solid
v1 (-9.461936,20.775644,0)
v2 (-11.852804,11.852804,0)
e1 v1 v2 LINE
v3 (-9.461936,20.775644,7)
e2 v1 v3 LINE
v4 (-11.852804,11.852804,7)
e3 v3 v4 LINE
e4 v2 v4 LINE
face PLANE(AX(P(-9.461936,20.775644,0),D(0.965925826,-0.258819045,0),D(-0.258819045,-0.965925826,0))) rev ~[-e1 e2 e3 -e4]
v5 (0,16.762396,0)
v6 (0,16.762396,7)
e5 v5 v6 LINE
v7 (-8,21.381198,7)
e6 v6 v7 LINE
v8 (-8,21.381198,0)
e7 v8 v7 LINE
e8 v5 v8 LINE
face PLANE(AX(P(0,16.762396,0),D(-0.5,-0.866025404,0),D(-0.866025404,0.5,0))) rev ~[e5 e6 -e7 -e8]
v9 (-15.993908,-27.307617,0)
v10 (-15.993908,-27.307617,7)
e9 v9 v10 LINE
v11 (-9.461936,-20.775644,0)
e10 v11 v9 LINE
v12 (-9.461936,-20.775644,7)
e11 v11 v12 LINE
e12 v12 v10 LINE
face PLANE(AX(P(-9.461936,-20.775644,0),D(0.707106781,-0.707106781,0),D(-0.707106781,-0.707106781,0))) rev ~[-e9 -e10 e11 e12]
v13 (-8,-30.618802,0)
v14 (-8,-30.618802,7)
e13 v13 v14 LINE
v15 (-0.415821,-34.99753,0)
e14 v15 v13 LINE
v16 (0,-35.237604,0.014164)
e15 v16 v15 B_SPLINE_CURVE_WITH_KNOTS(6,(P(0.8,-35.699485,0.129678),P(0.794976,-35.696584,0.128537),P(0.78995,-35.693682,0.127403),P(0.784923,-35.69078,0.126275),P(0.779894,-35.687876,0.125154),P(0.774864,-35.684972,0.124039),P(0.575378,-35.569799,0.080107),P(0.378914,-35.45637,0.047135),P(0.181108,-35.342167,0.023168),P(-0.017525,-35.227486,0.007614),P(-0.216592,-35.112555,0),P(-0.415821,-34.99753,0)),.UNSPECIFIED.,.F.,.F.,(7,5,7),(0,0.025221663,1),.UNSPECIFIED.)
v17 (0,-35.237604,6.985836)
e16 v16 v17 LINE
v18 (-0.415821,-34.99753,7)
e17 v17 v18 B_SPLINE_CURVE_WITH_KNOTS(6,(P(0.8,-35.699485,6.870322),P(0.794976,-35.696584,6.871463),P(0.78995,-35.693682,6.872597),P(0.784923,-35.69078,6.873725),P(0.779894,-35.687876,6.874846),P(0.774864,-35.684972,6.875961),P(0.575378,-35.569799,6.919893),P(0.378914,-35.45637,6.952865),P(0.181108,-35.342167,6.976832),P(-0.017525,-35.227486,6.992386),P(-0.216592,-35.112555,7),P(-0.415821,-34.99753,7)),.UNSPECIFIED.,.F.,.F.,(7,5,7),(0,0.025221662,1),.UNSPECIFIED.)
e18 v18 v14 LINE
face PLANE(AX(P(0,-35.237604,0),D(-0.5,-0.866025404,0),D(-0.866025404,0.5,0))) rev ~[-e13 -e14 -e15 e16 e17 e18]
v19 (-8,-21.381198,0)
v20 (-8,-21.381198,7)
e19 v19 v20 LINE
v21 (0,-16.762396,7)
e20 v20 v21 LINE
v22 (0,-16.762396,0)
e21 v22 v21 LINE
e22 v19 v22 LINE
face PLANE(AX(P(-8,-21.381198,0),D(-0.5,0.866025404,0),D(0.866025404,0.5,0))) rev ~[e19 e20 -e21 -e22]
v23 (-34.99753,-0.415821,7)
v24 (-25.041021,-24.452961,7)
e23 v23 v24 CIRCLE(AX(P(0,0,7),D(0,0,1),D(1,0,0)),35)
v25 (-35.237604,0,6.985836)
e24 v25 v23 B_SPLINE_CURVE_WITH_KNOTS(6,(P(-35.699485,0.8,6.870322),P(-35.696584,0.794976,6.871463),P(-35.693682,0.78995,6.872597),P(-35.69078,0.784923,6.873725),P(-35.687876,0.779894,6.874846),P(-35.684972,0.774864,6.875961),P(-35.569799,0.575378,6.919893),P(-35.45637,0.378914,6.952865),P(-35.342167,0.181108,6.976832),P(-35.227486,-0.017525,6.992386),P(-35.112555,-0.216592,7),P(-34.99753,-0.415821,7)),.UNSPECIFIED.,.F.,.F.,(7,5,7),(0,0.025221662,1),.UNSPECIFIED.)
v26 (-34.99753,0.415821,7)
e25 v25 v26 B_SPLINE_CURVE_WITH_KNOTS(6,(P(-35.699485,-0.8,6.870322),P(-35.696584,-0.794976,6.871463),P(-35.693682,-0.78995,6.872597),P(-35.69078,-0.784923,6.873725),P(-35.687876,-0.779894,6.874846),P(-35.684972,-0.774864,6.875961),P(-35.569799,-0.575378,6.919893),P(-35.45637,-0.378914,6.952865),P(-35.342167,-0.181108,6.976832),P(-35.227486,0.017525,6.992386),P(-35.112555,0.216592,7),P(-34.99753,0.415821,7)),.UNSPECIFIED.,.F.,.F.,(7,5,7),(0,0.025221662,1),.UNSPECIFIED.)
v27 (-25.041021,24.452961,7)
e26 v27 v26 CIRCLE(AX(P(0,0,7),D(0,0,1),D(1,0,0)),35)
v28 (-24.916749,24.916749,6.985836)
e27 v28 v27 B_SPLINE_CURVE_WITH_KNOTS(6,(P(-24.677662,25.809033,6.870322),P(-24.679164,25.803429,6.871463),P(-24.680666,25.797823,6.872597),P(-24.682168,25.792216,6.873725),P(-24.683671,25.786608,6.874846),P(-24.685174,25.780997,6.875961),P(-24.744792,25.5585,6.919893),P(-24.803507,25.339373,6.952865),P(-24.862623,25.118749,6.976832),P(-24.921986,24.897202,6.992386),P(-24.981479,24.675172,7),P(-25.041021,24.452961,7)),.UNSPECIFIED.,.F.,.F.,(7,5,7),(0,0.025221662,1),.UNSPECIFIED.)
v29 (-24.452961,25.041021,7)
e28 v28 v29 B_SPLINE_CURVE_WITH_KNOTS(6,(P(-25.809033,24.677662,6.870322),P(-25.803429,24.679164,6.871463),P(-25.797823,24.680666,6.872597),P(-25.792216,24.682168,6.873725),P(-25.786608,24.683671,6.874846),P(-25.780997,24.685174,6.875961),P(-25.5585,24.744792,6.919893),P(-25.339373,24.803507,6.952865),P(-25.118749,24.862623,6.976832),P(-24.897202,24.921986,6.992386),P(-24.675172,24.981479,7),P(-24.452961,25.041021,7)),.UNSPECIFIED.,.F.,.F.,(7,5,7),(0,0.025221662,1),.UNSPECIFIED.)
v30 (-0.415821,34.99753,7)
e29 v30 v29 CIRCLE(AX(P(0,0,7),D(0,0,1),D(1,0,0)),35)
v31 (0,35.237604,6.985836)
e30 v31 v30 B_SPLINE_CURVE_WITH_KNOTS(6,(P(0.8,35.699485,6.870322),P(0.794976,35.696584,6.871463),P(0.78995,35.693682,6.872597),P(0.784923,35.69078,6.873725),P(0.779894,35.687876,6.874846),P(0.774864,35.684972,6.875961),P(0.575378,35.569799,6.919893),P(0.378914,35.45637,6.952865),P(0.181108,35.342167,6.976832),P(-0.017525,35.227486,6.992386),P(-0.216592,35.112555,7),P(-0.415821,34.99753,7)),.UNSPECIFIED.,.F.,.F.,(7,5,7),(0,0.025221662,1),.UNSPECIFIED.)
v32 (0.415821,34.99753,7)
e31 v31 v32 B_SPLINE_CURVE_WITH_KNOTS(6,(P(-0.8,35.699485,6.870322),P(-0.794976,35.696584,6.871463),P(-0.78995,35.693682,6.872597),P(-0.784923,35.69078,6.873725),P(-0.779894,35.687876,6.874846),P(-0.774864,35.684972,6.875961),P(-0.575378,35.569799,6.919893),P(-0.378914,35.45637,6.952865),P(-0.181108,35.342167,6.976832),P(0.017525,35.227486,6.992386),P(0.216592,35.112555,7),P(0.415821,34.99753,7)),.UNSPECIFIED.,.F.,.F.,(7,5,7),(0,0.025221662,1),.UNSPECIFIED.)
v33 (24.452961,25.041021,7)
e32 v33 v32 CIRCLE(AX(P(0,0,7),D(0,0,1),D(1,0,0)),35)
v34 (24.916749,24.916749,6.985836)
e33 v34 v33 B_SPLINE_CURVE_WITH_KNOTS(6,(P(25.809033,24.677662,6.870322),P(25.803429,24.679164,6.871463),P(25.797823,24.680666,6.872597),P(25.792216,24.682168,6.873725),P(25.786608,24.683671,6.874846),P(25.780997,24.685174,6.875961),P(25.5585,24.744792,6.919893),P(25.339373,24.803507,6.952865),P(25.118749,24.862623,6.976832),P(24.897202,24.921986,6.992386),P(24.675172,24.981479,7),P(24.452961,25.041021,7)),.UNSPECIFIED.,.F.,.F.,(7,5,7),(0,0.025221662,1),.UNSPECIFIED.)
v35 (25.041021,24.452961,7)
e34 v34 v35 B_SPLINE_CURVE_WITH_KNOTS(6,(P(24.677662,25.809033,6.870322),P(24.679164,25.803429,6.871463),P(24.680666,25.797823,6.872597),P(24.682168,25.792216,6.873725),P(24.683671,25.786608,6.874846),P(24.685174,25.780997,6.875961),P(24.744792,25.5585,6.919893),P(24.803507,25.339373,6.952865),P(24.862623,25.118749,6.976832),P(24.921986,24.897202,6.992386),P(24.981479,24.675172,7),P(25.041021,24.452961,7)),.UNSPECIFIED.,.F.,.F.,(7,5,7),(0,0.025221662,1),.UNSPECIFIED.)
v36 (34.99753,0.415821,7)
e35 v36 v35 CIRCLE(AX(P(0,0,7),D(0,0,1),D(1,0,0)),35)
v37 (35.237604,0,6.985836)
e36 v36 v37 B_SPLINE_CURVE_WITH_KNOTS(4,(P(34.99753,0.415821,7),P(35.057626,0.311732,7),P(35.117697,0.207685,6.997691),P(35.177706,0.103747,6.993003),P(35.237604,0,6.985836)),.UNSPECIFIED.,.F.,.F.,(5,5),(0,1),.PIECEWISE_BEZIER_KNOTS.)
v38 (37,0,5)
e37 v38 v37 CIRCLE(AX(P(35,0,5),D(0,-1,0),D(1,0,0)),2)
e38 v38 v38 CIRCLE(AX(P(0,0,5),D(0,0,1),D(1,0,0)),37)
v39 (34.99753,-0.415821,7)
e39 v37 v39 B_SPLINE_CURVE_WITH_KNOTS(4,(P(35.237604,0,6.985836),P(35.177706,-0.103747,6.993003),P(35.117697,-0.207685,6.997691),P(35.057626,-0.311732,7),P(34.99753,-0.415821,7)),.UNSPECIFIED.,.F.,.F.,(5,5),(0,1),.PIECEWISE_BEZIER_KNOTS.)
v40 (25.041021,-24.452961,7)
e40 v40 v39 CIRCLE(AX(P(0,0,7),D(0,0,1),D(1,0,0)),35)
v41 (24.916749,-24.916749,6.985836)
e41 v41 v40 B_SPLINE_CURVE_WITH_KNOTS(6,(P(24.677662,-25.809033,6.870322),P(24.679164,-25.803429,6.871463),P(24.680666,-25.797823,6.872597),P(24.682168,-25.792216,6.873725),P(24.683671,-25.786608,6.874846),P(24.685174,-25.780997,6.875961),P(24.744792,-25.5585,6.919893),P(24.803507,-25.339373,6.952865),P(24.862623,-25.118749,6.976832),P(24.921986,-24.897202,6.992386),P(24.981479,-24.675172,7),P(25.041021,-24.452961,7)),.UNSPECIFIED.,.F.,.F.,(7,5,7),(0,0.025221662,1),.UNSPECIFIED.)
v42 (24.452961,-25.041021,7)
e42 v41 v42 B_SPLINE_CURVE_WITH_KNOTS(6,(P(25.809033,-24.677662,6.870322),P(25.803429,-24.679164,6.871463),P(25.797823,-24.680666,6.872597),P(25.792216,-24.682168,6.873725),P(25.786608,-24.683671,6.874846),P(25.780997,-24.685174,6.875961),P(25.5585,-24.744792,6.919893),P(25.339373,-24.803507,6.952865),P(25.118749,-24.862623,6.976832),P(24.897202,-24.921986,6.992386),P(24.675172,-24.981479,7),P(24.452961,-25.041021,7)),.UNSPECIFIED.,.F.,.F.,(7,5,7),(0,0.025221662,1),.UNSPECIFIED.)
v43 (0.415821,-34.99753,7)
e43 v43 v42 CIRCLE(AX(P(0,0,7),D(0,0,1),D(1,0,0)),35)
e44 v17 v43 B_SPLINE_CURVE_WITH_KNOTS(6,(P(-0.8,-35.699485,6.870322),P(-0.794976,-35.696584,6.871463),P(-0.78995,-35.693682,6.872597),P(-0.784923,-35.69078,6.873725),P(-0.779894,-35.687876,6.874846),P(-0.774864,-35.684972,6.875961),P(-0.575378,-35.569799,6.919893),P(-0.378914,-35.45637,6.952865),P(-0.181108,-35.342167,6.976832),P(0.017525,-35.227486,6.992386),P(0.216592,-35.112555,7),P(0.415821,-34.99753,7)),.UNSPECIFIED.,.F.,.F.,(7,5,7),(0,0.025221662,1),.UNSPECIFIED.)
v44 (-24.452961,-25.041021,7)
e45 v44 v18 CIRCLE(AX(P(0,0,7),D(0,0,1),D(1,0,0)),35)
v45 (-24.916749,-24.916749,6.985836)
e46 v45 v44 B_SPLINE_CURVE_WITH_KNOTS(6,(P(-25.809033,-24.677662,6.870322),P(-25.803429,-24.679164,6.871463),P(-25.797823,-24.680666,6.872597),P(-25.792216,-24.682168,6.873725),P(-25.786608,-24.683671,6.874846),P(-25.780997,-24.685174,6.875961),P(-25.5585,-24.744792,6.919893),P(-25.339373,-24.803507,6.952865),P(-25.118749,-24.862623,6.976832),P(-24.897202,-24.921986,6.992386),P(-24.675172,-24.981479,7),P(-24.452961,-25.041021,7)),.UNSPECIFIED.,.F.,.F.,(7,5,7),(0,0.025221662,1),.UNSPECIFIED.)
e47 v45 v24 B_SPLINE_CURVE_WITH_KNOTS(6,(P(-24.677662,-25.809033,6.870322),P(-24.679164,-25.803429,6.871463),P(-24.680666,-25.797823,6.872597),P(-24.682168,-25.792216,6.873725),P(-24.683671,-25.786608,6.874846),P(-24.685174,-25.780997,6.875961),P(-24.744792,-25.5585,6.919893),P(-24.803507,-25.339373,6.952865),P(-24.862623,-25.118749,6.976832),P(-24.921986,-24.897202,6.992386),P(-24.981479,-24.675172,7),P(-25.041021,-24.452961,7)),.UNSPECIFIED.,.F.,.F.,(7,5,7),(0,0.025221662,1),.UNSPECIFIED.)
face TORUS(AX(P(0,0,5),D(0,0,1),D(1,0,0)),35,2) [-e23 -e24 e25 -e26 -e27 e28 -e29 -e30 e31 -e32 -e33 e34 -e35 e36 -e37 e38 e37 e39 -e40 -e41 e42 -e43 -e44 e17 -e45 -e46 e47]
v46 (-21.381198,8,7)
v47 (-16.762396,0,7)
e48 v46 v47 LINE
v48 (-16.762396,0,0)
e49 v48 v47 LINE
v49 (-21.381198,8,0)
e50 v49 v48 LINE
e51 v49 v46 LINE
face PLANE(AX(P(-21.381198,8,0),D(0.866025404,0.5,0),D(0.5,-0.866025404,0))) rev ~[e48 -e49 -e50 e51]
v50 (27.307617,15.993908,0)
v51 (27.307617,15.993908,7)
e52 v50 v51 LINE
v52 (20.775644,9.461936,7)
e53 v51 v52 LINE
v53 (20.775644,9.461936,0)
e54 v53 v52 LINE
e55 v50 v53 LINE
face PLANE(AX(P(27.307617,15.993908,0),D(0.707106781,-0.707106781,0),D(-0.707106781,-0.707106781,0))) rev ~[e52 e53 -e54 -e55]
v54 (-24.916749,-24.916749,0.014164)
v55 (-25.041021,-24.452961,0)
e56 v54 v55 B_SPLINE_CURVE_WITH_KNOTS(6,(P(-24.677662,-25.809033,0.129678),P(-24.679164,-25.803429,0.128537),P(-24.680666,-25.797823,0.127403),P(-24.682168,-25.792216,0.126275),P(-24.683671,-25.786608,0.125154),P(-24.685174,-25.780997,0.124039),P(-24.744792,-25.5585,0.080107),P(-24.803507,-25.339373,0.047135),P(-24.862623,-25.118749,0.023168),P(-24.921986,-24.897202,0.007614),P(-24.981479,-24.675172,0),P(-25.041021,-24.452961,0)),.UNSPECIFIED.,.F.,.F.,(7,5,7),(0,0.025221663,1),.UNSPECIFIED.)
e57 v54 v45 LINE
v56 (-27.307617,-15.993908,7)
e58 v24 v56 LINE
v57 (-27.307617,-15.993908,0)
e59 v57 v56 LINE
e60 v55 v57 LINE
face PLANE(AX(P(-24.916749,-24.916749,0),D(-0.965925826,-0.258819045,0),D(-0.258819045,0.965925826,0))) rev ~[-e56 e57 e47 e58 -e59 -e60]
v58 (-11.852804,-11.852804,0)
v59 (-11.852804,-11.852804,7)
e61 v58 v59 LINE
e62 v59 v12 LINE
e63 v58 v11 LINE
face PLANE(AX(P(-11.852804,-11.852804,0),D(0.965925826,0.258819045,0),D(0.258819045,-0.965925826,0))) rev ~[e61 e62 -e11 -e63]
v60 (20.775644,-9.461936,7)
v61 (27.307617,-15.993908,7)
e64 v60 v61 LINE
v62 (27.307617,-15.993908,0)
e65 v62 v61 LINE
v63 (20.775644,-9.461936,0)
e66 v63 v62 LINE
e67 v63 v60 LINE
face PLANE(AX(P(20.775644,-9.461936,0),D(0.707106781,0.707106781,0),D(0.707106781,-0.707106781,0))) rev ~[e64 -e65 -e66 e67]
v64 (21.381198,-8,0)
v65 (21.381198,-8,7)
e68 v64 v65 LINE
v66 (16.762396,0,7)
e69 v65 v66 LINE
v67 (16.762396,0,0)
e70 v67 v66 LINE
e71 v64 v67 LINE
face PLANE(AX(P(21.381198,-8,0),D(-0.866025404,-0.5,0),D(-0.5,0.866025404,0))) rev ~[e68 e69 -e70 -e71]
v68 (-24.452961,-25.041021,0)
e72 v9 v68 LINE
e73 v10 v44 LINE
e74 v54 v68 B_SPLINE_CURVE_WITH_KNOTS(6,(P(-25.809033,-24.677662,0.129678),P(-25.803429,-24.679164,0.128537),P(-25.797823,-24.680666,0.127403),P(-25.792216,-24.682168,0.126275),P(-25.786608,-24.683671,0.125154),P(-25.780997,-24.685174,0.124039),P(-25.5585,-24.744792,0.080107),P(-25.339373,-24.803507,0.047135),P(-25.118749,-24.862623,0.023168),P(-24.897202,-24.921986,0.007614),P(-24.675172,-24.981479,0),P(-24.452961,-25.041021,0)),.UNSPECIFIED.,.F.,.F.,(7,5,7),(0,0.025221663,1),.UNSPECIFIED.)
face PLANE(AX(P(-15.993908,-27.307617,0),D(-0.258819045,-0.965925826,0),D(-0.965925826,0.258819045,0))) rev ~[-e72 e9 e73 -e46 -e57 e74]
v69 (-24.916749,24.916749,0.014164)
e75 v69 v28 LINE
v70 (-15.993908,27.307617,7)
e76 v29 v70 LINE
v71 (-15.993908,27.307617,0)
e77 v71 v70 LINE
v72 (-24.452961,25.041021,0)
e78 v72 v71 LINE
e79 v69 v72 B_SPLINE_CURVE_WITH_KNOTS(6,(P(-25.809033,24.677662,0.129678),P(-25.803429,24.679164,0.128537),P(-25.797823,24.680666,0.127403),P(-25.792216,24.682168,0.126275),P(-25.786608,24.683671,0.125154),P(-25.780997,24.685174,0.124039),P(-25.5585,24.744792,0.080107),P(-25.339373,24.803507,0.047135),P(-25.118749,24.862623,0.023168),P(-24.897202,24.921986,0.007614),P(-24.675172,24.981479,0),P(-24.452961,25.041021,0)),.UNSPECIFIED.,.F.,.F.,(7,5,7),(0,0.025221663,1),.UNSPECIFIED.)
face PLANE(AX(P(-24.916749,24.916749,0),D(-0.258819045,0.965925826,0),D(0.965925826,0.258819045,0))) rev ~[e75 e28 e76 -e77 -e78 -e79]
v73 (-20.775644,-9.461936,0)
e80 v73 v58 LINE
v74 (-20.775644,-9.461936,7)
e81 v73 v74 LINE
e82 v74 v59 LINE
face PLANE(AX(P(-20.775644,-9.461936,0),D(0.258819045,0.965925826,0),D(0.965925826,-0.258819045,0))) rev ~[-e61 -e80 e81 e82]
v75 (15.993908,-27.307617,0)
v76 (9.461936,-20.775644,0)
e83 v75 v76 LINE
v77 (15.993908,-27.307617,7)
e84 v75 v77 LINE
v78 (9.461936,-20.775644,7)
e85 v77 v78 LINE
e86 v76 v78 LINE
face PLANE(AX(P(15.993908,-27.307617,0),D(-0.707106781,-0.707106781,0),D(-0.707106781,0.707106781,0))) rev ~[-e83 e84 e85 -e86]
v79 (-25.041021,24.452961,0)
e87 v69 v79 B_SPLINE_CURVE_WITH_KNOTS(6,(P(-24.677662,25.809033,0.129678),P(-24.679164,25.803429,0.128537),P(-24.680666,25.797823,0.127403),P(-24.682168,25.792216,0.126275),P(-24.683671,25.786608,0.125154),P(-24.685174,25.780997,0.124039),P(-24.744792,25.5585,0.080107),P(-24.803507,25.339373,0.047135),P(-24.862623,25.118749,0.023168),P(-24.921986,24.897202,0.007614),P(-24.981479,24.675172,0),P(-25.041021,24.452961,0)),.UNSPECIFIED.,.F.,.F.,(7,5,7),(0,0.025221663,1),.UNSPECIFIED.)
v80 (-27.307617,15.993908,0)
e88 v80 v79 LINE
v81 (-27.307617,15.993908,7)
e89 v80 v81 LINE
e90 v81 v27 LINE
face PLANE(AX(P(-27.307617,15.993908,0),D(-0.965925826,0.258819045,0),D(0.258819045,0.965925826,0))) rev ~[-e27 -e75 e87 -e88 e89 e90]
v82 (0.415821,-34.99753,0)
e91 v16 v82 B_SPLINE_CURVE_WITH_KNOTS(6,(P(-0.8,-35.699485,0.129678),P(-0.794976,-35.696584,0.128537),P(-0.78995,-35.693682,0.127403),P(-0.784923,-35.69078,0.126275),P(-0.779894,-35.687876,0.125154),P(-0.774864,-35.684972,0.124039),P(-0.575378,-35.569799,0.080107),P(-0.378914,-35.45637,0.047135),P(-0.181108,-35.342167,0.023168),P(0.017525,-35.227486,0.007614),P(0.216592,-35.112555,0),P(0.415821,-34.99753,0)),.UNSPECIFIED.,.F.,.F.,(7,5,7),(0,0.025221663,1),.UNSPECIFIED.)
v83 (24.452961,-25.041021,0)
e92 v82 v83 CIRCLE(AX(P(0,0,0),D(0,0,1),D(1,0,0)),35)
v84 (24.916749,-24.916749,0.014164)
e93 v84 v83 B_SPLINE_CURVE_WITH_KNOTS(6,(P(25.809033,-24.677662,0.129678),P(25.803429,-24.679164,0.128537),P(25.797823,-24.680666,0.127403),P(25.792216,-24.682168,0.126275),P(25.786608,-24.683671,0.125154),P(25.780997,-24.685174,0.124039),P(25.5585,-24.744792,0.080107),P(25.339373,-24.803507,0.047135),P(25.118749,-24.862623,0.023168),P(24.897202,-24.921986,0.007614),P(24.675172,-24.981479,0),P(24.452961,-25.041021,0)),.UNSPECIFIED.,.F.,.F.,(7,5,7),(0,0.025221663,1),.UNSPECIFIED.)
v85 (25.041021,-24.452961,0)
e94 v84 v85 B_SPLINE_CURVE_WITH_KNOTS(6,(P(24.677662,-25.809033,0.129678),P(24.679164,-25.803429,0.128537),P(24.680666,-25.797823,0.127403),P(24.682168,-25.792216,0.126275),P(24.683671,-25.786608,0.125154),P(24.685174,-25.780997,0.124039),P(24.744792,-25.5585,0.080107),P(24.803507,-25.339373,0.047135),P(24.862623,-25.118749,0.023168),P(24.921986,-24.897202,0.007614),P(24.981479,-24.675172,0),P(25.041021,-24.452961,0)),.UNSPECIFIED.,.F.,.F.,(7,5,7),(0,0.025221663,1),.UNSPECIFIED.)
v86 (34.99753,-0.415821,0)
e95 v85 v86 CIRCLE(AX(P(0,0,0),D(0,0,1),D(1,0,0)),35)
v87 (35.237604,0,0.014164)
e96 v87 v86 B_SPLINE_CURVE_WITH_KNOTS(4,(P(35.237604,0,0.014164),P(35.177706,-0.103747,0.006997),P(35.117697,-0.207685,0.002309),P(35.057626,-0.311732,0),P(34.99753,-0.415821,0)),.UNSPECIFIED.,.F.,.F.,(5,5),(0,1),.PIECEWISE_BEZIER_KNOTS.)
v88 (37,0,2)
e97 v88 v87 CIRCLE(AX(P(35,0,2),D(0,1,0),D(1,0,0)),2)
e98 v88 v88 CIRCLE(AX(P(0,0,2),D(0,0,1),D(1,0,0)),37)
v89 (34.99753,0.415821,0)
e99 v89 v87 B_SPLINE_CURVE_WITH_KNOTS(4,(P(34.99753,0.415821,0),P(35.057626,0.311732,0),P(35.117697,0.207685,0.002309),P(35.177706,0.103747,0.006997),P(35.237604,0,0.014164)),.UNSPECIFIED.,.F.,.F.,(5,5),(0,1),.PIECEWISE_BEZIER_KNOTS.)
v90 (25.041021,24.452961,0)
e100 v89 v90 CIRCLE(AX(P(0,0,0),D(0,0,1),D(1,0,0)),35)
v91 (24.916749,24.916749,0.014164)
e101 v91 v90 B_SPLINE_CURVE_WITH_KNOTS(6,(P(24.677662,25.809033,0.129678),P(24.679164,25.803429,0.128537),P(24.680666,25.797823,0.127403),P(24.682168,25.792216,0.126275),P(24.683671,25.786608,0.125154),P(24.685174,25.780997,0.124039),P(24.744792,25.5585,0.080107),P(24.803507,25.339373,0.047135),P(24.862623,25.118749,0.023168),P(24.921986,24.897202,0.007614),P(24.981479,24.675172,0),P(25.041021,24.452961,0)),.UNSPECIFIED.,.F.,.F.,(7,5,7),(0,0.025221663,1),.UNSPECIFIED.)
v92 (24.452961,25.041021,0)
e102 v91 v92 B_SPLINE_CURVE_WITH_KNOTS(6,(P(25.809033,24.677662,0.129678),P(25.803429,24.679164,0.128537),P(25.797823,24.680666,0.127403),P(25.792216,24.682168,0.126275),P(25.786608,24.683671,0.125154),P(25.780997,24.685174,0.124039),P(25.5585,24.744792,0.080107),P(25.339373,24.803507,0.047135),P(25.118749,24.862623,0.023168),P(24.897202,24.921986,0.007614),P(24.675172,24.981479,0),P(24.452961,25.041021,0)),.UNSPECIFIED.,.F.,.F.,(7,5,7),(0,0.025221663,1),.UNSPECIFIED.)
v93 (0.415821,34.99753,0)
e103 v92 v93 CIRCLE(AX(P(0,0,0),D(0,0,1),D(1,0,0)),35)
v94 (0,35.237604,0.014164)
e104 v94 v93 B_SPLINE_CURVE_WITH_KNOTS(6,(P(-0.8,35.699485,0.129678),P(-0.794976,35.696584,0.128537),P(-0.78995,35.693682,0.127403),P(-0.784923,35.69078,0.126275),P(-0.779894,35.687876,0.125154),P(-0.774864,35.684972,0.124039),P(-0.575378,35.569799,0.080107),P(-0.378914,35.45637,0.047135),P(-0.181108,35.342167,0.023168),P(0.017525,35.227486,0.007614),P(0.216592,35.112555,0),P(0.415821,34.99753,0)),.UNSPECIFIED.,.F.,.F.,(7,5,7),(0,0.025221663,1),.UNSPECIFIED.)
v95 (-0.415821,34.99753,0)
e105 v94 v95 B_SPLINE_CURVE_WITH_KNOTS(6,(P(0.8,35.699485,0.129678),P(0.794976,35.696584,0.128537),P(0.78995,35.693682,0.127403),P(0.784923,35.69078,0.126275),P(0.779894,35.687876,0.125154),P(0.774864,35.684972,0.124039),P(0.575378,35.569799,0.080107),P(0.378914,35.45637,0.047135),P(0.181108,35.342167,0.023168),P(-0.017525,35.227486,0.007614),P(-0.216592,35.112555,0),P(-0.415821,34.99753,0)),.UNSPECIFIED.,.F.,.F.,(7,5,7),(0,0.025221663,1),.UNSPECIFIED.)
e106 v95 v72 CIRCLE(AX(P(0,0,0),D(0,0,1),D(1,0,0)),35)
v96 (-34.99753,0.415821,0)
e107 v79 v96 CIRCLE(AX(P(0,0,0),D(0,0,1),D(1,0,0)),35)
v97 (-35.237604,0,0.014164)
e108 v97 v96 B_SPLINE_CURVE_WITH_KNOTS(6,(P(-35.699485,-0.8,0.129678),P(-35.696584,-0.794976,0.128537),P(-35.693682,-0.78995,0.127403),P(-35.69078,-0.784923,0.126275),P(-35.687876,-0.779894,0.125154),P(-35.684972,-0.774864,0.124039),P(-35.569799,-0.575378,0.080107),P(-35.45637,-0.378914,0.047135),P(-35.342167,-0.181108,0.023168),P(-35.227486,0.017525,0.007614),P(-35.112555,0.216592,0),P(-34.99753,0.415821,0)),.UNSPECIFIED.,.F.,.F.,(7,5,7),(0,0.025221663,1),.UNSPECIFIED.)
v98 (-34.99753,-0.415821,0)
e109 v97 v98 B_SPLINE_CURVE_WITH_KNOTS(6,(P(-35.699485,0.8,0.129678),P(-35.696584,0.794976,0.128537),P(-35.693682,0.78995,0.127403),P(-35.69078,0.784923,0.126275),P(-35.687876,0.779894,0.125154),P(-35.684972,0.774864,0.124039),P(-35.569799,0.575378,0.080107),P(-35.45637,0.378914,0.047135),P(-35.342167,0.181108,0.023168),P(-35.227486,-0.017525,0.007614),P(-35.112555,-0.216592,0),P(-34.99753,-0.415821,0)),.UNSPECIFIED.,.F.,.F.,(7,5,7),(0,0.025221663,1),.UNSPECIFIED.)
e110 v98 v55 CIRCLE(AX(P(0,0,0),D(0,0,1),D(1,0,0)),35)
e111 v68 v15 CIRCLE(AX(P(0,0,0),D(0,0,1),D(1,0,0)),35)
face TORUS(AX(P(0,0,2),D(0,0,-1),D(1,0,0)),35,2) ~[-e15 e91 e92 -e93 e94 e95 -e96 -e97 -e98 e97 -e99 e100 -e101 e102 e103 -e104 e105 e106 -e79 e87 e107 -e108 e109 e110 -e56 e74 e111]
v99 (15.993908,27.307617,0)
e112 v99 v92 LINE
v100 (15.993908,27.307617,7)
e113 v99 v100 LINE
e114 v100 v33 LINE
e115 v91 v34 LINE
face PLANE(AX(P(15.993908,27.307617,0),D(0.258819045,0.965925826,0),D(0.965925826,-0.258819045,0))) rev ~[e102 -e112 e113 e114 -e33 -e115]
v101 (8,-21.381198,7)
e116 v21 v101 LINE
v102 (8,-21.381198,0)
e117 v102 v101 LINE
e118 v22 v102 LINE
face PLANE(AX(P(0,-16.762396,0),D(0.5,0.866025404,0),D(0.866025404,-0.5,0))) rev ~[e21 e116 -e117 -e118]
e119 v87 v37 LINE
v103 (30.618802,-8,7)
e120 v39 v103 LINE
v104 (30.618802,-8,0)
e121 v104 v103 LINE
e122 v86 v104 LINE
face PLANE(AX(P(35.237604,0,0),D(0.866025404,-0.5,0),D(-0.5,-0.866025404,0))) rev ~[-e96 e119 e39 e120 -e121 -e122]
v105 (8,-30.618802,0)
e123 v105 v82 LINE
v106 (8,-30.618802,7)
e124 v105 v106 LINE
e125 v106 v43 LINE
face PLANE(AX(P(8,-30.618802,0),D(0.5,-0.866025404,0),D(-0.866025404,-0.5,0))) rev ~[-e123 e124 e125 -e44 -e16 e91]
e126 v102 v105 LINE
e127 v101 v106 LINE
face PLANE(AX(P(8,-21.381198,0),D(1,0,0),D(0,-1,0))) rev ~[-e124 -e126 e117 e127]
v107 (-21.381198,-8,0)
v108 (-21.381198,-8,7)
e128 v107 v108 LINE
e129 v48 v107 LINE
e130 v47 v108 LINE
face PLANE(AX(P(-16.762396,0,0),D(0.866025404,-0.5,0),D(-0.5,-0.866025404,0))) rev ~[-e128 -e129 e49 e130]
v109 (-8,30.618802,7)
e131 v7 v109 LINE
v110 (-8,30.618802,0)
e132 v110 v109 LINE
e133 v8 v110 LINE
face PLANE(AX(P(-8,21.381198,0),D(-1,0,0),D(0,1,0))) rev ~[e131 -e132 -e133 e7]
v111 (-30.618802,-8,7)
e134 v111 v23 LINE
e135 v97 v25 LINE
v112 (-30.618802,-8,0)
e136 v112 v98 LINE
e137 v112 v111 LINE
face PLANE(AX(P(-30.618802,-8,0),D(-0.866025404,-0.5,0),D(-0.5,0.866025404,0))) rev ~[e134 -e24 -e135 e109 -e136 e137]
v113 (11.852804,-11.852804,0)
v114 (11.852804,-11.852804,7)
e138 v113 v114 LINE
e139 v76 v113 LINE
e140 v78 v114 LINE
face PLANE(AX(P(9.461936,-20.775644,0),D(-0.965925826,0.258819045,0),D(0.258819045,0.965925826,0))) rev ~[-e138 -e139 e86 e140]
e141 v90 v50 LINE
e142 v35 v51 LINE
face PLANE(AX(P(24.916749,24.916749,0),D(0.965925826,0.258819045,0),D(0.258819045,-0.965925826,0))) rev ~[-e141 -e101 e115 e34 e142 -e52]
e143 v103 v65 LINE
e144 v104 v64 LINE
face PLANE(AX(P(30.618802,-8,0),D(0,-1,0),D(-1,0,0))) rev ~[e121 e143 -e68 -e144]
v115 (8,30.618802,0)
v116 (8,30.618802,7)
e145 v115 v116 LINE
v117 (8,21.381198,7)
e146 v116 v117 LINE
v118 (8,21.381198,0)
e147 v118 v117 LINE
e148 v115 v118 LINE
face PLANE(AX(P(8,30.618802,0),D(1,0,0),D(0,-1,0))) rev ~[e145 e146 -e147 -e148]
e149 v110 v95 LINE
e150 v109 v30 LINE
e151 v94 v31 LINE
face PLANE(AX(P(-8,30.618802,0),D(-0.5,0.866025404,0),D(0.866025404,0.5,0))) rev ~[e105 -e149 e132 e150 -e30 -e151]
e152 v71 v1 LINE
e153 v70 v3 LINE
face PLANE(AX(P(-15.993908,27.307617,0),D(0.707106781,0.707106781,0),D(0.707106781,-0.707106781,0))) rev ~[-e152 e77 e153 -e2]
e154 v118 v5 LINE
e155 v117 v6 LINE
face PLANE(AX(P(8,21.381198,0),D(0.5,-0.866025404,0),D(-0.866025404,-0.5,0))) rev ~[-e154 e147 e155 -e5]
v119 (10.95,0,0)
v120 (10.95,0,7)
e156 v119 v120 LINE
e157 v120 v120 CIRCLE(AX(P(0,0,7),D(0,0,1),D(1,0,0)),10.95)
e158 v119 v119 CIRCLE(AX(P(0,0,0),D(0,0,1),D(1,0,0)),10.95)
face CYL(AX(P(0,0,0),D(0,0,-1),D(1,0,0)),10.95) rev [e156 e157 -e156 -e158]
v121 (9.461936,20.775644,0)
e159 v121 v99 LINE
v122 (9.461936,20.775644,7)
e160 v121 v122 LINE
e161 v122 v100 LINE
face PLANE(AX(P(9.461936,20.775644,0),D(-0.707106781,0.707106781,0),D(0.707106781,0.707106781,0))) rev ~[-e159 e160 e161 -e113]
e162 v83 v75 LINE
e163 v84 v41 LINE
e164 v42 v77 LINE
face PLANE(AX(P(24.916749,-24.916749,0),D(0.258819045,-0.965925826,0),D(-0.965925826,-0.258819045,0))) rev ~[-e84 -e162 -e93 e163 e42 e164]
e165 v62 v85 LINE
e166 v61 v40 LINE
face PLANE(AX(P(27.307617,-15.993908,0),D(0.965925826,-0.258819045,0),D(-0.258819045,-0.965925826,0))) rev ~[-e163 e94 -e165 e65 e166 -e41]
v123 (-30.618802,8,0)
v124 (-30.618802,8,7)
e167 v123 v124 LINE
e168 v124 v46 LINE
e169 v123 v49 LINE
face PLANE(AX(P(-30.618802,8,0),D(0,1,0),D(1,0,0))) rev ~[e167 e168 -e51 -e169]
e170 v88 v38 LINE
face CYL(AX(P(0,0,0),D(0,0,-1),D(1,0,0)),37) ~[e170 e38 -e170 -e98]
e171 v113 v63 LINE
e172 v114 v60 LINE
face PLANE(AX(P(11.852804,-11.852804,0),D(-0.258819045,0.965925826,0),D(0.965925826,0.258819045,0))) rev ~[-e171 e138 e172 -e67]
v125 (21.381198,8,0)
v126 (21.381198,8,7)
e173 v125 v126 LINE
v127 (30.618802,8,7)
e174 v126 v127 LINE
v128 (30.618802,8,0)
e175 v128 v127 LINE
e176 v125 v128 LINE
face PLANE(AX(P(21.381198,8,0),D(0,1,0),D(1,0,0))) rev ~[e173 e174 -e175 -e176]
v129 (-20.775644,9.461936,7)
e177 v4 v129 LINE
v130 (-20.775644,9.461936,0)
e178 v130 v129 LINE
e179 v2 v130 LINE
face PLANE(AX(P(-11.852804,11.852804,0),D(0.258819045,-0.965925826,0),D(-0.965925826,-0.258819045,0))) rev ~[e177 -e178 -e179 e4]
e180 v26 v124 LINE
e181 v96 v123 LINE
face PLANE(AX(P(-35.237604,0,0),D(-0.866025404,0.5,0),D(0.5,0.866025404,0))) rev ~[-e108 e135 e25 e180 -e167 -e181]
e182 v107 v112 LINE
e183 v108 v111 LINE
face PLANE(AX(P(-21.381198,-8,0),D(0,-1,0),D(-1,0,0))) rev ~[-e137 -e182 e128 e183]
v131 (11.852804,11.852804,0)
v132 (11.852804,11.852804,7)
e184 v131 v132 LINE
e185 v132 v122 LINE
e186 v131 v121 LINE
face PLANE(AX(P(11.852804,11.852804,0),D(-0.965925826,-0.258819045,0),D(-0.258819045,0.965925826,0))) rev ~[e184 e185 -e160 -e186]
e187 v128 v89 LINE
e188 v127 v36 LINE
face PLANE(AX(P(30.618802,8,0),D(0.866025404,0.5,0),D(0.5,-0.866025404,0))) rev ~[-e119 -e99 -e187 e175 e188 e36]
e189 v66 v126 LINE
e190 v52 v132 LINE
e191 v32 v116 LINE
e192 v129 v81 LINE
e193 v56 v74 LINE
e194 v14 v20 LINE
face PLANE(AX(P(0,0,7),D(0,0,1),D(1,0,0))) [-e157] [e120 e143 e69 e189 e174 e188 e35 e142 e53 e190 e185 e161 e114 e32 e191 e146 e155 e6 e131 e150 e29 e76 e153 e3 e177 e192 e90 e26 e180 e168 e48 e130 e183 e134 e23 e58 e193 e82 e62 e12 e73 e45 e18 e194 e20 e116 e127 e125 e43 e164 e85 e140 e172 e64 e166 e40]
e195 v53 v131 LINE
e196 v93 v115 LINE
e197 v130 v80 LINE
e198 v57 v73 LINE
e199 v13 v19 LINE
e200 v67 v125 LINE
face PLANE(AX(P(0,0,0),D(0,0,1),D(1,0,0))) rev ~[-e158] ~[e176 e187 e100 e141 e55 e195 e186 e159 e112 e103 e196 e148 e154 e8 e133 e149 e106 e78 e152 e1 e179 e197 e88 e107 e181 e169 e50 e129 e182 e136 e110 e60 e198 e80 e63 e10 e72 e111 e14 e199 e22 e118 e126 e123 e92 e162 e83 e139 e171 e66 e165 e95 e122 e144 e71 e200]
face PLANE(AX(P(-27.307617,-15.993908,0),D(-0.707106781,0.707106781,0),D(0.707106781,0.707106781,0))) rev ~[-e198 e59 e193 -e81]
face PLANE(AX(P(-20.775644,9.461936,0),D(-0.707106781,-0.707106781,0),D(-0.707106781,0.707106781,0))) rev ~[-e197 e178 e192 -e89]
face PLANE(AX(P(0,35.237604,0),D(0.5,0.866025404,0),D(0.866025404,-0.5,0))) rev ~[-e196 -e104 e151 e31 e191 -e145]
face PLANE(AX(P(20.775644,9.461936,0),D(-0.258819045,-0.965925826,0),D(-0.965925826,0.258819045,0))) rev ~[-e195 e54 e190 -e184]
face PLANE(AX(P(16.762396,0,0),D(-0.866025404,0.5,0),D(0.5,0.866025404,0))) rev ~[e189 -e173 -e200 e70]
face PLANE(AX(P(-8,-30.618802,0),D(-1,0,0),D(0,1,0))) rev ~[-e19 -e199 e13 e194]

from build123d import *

# Parameters (mm, degrees)
F0_R     = 37
F0_R_2   = 10.95
F1_DEPTH = 7


# Not quite as in the source:
# - a fillet or chamfer that OpenCascade refuses, or shapes differently, is made with other operations: its cross-section is extruded or revolved along the edge and cut away or added


with BuildPart() as f1:
    # F0 (on Top) → F1 (new body)
    with BuildSketch(Plane.XY):
        Circle(F0_R)
        Polygon((-15.9939083851, -27.3076168841), (-24.9167489583, -24.9167489583), (-27.3076168841, -15.9939083851), (-20.7756442366, -9.4619357376), (-11.8528036634, -11.8528036634), (-9.4619357376, -20.7756442366), align=None, mode=Mode.SUBTRACT)
        Polygon((8, -30.6188021535), (0, -35.237604307), (-8, -30.6188021535), (-8, -21.3811978465), (0, -16.762395693), (8, -21.3811978465), align=None, mode=Mode.SUBTRACT)
        Polygon((27.3076168841, -15.9939083851), (24.9167489583, -24.9167489583), (15.9939083851, -27.3076168841), (9.4619357376, -20.7756442366), (11.8528036634, -11.8528036634), (20.7756442366, -9.4619357376), align=None, mode=Mode.SUBTRACT)
        Polygon((-30.6188021535, -8), (-35.237604307, 0), (-30.6188021535, 8), (-21.3811978465, 8), (-16.762395693, 0), (-21.3811978465, -8), align=None, mode=Mode.SUBTRACT)
        Polygon((-27.3076168841, 15.9939083851), (-24.9167489583, 24.9167489583), (-15.9939083851, 27.3076168841), (-9.4619357376, 20.7756442366), (-11.8528036634, 11.8528036634), (-20.7756442366, 9.4619357376), align=None, mode=Mode.SUBTRACT)
        Circle(F0_R_2, mode=Mode.SUBTRACT)
        Polygon((15.9939083851, 27.3076168841), (24.9167489583, 24.9167489583), (27.3076168841, 15.9939083851), (20.7756442366, 9.4619357376), (11.8528036634, 11.8528036634), (9.4619357376, 20.7756442366), align=None, mode=Mode.SUBTRACT)
        Polygon((30.6188021535, 8), (35.237604307, 0), (30.6188021535, -8), (21.3811978465, -8), (16.762395693, 0), (21.3811978465, 8), align=None, mode=Mode.SUBTRACT)
        Polygon((0, 35.237604307), (8, 30.6188021535), (8, 21.3811978465), (0, 16.762395693), (-8, 21.3811978465), (-8, 30.6188021535), align=None, mode=Mode.SUBTRACT)
    extrude(amount=F1_DEPTH)

    # F2: fillet of radius 2 on 2 edges, made by hand

    # F2_s1 → F2_t2 (revolve, cut)
    with BuildSketch(Plane.XZ):
        with BuildLine():
            ThreePointArc((37, 5), (36.4142135624, 6.4142135624), (35, 7))
            Line((35, 7), (37, 7))
            Line((37, 7), (37, 5))
        make_face()
    revolve(axis=Axis((0, 0, 7), (0, 0, 1)), mode=Mode.SUBTRACT)

    # F2_s3 → F2_t4 (revolve, cut)
    with BuildSketch(Plane.XZ):
        with BuildLine():
            ThreePointArc((37, 2), (36.4142135624, 0.5857864376), (35, 0))
            Line((35, 0), (37, 0))
            Line((37, 0), (37, 2))
        make_face()
    revolve(axis=Axis((0, 0, 0), (0, 0, 1)), mode=Mode.SUBTRACT)


solid = f1.part
